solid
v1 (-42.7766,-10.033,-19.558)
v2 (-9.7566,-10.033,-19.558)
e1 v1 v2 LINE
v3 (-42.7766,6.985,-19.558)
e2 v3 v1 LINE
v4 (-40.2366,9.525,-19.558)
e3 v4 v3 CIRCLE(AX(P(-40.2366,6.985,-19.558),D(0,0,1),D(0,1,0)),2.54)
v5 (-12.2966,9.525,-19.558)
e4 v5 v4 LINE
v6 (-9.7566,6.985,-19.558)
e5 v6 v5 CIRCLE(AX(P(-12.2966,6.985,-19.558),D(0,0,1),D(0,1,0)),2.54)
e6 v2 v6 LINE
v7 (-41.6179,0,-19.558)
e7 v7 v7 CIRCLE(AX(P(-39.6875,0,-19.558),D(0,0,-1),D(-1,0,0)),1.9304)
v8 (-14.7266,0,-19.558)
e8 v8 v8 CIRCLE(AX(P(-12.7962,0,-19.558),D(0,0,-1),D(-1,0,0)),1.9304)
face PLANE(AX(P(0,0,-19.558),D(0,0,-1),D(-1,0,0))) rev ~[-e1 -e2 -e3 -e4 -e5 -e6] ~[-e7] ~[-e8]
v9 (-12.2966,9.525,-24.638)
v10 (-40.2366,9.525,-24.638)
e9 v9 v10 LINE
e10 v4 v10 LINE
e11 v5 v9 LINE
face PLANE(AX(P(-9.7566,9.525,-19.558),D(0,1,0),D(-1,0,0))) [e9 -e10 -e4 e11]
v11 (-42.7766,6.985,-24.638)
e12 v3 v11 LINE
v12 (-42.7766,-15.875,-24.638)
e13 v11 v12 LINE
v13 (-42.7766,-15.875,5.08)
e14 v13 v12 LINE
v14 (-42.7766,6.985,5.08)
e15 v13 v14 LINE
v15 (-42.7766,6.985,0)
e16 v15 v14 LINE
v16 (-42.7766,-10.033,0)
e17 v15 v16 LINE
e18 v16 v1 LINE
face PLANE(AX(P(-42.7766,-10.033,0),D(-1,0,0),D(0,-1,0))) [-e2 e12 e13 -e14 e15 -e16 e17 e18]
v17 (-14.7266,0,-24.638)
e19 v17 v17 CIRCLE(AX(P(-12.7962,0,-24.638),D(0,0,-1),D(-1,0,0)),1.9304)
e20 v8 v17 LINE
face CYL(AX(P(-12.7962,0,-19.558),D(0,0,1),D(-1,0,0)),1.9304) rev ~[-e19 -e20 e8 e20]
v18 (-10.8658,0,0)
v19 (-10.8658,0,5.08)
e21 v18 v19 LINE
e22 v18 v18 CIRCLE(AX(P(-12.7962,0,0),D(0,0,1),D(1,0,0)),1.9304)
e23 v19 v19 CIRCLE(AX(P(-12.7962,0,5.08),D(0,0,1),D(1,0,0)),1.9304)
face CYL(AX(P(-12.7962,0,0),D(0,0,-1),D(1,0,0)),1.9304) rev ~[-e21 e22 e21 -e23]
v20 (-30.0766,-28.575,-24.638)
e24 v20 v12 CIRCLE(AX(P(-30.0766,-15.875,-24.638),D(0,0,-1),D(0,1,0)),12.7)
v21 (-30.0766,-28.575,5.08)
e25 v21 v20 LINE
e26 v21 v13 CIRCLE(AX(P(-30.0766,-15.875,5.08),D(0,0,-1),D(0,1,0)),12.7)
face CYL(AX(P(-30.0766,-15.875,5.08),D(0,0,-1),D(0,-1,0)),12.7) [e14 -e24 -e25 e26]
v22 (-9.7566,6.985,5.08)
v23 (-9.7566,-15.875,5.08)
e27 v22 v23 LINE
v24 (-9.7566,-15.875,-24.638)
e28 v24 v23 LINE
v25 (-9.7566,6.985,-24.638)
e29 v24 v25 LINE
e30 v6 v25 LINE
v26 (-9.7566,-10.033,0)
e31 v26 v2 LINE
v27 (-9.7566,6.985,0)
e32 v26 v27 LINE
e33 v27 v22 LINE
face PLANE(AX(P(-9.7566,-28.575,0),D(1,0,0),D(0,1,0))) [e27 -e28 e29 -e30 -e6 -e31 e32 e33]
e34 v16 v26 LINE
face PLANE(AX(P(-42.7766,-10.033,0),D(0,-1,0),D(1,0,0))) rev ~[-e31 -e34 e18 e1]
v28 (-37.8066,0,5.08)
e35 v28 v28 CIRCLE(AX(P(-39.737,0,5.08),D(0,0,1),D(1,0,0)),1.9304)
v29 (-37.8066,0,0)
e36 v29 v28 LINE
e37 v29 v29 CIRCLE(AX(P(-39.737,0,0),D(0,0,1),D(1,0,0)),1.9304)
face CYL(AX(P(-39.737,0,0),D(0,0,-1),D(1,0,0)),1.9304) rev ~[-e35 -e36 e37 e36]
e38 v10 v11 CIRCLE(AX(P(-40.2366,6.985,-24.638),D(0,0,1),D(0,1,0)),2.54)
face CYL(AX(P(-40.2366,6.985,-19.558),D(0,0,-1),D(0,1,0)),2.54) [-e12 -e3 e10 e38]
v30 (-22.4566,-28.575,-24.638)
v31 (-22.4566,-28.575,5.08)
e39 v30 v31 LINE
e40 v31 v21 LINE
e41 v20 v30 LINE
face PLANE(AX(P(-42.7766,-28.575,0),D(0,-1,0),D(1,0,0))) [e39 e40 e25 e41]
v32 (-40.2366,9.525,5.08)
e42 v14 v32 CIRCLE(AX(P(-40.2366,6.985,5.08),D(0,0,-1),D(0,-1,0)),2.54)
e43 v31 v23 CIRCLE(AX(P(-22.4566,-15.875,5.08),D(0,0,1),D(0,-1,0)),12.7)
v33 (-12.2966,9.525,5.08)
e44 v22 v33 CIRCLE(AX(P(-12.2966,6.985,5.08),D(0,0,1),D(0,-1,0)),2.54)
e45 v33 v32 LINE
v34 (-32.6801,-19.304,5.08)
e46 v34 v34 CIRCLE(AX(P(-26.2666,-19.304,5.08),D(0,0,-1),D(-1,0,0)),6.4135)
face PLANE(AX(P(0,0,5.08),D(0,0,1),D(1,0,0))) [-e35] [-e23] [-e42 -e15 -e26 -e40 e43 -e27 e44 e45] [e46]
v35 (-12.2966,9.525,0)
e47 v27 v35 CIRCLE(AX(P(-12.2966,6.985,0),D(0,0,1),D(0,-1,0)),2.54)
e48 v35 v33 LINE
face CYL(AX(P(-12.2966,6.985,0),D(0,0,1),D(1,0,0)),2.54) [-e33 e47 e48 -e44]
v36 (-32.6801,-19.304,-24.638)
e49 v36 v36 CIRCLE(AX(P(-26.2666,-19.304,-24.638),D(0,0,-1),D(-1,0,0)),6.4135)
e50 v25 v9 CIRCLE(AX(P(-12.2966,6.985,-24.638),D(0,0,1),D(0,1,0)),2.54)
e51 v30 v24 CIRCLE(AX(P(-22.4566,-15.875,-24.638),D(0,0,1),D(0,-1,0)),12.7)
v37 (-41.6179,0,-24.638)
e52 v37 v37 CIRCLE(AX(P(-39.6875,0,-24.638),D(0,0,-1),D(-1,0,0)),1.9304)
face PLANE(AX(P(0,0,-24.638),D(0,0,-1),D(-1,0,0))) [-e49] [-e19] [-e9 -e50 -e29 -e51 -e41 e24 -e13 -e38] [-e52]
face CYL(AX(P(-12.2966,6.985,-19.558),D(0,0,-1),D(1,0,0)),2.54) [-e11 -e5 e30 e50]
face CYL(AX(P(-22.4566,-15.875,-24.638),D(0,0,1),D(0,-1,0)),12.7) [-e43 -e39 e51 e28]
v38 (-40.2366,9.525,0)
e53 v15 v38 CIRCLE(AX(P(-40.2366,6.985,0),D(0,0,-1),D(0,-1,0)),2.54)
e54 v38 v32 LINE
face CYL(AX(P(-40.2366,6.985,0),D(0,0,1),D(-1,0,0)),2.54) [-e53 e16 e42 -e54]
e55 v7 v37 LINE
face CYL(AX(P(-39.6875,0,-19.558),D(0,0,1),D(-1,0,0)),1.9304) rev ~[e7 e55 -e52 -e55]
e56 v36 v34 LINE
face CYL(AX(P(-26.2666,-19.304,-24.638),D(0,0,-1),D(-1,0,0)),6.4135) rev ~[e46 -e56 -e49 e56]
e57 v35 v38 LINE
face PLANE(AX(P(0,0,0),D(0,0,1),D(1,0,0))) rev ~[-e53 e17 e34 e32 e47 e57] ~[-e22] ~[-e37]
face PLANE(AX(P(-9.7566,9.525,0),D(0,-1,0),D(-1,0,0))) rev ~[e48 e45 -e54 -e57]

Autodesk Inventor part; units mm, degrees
ref_plane "YZ Plane" through (0, 0, 0) normal (1, 0, 0) x (0, 1, 0)
ref_plane "XZ Plane" through (0, 0, 0) normal (0, 1, 0) x (-1, 0, 0)
ref_plane "XY Plane" through (0, 0, 0) normal (0, 0, 1) x (1, 0, 0)
ref_plane "Work Plane1" through (0, 0, 0) normal (0, 0, 1) x (1, 0, 0)
sketch "Sketch1" plane through (0, 0, 0) normal (0, 0, 1) x (1, 0, 0)
  line L0 (-9.7566, -4.627) -> (-9.7566, 4.627) construction
  line L1 (-9.7566, -9.525) -> (-314.5566, -9.525) construction
  line L2 (-9.7566, 9.525) -> (-314.5566, 9.525) construction
  line L3 (-42.7766, 3) -> (-42.7766, -3) construction
  line L4 (-9.7566, 9.525) -> (-42.7766, 9.525)
  line L5 (-42.7766, 9.525) -> (-42.7766, -9.525)
  line L6 (-9.7566, -9.525) -> (-9.7566, 9.525)
  line L7 (-9.7566, -9.525) -> (-9.7566, -28.575)
  line L8 (-9.7566, -28.575) -> (-42.7766, -28.575)
  line L9 (-42.7766, -28.575) -> (-42.7766, -9.525)
  arc A0 (-38.0982, 0.6213) -> (-38.1469, -0.737) centre (-39.737, 0) ccw construction
  arc A1 (-11.1575, 0.6213) -> (-11.2061, -0.737) centre (-12.7962, 0) ccw construction
  circle A2 centre (-12.7962, 0) radius 1.9304
  circle A3 centre (-39.737, 0) radius 1.9304
  point P0 (0, 0)
  dimension "d1" = 19.05
  dimension "d2" = 3.8608
  dimension "d3" = 3.8608
extrude "Extrusion1" add sketch "Sketch1" along normal blind 5.08
ref_plane "Work Plane2" through (0, 0, -19.558) normal (0, 0, -1) x (-1, 0, 0)
sketch "Sketch2" plane through (0, 0, -19.558) normal (0, 0, -1) x (-1, 0, 0)
  line L0 (9.7566, -28.575) -> (9.7566, 9.525) projected
  line L1 (42.7766, 9.525) -> (42.7766, -28.575) projected
  line L2 (9.7566, 9.525) -> (42.7766, 9.525)
  line L3 (42.7766, 9.525) -> (42.7766, -28.575)
  line L4 (42.7766, -28.575) -> (9.7566, -28.575)
  line L5 (9.7566, -28.575) -> (9.7566, 9.525)
  circle A0 centre (12.7962, 0) radius 1.9304 projected
  circle A1 centre (12.7962, 0) radius 1.9304
  circle A2 centre (39.6875, 0) radius 1.9304
  point P0 (0, 0)
  dimension "d7" = 3.8608
  dimension "d8" = 3.8608
  dimension "d24" = 38.1
  dimension "d25" = 9.525
  dimension "d26" = 26.8913
extrude "Extrusion2" add sketch "Sketch2" along normal blind 5.08
sketch "Sketch3" plane through (0, 0, 0) normal (0, 0, -1) x (-1, 0, 0)
  line L0 (9.7566, 9.525) -> (42.7766, 9.525) construction
  line L1 (9.7566, 9.525) -> (42.7766, 9.525) construction
  line L2 (42.7766, 9.525) -> (42.7766, -9.525) construction
  line L3 (42.7766, -9.525) -> (9.7566, -9.525) construction
  line L4 (9.7566, -9.525) -> (9.7566, 9.525) construction
  line L5 (42.7766, -28.575) -> (9.7566, -28.575) projected
  line L6 (42.7766, -10.033) -> (42.7766, -28.575)
  line L7 (42.7766, -28.575) -> (9.7566, -28.575)
  line L8 (9.7566, -28.575) -> (9.7566, -10.033)
  line L9 (42.7766, 9.525) -> (42.7766, -28.575) projected
  line L10 (42.7766, -10.033) -> (9.7566, -10.033)
  point P0 (0, 0)
  dimension "d11" = 19.05
extrude "Extrusion3" add sketch "Sketch3" along normal up to surface (19.558 mm away)
sketch "Sketch4" plane through (0, 0, -24.638) normal (0, 0, -1) x (-1, 0, 0)
  circle A0 centre (26.2666, -19.304) radius 6.4135
  line L0 (9.7566, -28.575) -> (42.7766, -28.575) projected
  line L1 (42.7766, -28.575) -> (42.7766, 9.525) projected
  line L2 (9.7566, 9.525) -> (9.7566, -28.575) projected
  line L3 (42.7766, -10.033) -> (9.7566, -10.033) construction
  point P0 (0, 0)
  dimension "d15" = 12.827
  dimension "d16" = 9.271
  dimension "d17" = 33.02
  dimension "d18" = 16.51
  dimension "d19" = 18.542
extrude "Extrusion4" cut sketch "Sketch4" against normal through all
fillet "Fillet1" radius 12.7 2 edges at (-9.7566, -28.575, -9.779) (-42.7766, -28.575, -9.779)
fillet "Fillet2" radius 2.54 4 edges at (-9.7566, 9.525, -22.098) (-9.7566, 9.525, 2.54) (-42.7766, 9.525, -22.098) (-42.7766, 9.525, 2.54)
equation "\"d16\" = 0.5 * d19"
equation "\"d18\" = 0.5 * d17"
properties part number "Bearing mount for xrail"
